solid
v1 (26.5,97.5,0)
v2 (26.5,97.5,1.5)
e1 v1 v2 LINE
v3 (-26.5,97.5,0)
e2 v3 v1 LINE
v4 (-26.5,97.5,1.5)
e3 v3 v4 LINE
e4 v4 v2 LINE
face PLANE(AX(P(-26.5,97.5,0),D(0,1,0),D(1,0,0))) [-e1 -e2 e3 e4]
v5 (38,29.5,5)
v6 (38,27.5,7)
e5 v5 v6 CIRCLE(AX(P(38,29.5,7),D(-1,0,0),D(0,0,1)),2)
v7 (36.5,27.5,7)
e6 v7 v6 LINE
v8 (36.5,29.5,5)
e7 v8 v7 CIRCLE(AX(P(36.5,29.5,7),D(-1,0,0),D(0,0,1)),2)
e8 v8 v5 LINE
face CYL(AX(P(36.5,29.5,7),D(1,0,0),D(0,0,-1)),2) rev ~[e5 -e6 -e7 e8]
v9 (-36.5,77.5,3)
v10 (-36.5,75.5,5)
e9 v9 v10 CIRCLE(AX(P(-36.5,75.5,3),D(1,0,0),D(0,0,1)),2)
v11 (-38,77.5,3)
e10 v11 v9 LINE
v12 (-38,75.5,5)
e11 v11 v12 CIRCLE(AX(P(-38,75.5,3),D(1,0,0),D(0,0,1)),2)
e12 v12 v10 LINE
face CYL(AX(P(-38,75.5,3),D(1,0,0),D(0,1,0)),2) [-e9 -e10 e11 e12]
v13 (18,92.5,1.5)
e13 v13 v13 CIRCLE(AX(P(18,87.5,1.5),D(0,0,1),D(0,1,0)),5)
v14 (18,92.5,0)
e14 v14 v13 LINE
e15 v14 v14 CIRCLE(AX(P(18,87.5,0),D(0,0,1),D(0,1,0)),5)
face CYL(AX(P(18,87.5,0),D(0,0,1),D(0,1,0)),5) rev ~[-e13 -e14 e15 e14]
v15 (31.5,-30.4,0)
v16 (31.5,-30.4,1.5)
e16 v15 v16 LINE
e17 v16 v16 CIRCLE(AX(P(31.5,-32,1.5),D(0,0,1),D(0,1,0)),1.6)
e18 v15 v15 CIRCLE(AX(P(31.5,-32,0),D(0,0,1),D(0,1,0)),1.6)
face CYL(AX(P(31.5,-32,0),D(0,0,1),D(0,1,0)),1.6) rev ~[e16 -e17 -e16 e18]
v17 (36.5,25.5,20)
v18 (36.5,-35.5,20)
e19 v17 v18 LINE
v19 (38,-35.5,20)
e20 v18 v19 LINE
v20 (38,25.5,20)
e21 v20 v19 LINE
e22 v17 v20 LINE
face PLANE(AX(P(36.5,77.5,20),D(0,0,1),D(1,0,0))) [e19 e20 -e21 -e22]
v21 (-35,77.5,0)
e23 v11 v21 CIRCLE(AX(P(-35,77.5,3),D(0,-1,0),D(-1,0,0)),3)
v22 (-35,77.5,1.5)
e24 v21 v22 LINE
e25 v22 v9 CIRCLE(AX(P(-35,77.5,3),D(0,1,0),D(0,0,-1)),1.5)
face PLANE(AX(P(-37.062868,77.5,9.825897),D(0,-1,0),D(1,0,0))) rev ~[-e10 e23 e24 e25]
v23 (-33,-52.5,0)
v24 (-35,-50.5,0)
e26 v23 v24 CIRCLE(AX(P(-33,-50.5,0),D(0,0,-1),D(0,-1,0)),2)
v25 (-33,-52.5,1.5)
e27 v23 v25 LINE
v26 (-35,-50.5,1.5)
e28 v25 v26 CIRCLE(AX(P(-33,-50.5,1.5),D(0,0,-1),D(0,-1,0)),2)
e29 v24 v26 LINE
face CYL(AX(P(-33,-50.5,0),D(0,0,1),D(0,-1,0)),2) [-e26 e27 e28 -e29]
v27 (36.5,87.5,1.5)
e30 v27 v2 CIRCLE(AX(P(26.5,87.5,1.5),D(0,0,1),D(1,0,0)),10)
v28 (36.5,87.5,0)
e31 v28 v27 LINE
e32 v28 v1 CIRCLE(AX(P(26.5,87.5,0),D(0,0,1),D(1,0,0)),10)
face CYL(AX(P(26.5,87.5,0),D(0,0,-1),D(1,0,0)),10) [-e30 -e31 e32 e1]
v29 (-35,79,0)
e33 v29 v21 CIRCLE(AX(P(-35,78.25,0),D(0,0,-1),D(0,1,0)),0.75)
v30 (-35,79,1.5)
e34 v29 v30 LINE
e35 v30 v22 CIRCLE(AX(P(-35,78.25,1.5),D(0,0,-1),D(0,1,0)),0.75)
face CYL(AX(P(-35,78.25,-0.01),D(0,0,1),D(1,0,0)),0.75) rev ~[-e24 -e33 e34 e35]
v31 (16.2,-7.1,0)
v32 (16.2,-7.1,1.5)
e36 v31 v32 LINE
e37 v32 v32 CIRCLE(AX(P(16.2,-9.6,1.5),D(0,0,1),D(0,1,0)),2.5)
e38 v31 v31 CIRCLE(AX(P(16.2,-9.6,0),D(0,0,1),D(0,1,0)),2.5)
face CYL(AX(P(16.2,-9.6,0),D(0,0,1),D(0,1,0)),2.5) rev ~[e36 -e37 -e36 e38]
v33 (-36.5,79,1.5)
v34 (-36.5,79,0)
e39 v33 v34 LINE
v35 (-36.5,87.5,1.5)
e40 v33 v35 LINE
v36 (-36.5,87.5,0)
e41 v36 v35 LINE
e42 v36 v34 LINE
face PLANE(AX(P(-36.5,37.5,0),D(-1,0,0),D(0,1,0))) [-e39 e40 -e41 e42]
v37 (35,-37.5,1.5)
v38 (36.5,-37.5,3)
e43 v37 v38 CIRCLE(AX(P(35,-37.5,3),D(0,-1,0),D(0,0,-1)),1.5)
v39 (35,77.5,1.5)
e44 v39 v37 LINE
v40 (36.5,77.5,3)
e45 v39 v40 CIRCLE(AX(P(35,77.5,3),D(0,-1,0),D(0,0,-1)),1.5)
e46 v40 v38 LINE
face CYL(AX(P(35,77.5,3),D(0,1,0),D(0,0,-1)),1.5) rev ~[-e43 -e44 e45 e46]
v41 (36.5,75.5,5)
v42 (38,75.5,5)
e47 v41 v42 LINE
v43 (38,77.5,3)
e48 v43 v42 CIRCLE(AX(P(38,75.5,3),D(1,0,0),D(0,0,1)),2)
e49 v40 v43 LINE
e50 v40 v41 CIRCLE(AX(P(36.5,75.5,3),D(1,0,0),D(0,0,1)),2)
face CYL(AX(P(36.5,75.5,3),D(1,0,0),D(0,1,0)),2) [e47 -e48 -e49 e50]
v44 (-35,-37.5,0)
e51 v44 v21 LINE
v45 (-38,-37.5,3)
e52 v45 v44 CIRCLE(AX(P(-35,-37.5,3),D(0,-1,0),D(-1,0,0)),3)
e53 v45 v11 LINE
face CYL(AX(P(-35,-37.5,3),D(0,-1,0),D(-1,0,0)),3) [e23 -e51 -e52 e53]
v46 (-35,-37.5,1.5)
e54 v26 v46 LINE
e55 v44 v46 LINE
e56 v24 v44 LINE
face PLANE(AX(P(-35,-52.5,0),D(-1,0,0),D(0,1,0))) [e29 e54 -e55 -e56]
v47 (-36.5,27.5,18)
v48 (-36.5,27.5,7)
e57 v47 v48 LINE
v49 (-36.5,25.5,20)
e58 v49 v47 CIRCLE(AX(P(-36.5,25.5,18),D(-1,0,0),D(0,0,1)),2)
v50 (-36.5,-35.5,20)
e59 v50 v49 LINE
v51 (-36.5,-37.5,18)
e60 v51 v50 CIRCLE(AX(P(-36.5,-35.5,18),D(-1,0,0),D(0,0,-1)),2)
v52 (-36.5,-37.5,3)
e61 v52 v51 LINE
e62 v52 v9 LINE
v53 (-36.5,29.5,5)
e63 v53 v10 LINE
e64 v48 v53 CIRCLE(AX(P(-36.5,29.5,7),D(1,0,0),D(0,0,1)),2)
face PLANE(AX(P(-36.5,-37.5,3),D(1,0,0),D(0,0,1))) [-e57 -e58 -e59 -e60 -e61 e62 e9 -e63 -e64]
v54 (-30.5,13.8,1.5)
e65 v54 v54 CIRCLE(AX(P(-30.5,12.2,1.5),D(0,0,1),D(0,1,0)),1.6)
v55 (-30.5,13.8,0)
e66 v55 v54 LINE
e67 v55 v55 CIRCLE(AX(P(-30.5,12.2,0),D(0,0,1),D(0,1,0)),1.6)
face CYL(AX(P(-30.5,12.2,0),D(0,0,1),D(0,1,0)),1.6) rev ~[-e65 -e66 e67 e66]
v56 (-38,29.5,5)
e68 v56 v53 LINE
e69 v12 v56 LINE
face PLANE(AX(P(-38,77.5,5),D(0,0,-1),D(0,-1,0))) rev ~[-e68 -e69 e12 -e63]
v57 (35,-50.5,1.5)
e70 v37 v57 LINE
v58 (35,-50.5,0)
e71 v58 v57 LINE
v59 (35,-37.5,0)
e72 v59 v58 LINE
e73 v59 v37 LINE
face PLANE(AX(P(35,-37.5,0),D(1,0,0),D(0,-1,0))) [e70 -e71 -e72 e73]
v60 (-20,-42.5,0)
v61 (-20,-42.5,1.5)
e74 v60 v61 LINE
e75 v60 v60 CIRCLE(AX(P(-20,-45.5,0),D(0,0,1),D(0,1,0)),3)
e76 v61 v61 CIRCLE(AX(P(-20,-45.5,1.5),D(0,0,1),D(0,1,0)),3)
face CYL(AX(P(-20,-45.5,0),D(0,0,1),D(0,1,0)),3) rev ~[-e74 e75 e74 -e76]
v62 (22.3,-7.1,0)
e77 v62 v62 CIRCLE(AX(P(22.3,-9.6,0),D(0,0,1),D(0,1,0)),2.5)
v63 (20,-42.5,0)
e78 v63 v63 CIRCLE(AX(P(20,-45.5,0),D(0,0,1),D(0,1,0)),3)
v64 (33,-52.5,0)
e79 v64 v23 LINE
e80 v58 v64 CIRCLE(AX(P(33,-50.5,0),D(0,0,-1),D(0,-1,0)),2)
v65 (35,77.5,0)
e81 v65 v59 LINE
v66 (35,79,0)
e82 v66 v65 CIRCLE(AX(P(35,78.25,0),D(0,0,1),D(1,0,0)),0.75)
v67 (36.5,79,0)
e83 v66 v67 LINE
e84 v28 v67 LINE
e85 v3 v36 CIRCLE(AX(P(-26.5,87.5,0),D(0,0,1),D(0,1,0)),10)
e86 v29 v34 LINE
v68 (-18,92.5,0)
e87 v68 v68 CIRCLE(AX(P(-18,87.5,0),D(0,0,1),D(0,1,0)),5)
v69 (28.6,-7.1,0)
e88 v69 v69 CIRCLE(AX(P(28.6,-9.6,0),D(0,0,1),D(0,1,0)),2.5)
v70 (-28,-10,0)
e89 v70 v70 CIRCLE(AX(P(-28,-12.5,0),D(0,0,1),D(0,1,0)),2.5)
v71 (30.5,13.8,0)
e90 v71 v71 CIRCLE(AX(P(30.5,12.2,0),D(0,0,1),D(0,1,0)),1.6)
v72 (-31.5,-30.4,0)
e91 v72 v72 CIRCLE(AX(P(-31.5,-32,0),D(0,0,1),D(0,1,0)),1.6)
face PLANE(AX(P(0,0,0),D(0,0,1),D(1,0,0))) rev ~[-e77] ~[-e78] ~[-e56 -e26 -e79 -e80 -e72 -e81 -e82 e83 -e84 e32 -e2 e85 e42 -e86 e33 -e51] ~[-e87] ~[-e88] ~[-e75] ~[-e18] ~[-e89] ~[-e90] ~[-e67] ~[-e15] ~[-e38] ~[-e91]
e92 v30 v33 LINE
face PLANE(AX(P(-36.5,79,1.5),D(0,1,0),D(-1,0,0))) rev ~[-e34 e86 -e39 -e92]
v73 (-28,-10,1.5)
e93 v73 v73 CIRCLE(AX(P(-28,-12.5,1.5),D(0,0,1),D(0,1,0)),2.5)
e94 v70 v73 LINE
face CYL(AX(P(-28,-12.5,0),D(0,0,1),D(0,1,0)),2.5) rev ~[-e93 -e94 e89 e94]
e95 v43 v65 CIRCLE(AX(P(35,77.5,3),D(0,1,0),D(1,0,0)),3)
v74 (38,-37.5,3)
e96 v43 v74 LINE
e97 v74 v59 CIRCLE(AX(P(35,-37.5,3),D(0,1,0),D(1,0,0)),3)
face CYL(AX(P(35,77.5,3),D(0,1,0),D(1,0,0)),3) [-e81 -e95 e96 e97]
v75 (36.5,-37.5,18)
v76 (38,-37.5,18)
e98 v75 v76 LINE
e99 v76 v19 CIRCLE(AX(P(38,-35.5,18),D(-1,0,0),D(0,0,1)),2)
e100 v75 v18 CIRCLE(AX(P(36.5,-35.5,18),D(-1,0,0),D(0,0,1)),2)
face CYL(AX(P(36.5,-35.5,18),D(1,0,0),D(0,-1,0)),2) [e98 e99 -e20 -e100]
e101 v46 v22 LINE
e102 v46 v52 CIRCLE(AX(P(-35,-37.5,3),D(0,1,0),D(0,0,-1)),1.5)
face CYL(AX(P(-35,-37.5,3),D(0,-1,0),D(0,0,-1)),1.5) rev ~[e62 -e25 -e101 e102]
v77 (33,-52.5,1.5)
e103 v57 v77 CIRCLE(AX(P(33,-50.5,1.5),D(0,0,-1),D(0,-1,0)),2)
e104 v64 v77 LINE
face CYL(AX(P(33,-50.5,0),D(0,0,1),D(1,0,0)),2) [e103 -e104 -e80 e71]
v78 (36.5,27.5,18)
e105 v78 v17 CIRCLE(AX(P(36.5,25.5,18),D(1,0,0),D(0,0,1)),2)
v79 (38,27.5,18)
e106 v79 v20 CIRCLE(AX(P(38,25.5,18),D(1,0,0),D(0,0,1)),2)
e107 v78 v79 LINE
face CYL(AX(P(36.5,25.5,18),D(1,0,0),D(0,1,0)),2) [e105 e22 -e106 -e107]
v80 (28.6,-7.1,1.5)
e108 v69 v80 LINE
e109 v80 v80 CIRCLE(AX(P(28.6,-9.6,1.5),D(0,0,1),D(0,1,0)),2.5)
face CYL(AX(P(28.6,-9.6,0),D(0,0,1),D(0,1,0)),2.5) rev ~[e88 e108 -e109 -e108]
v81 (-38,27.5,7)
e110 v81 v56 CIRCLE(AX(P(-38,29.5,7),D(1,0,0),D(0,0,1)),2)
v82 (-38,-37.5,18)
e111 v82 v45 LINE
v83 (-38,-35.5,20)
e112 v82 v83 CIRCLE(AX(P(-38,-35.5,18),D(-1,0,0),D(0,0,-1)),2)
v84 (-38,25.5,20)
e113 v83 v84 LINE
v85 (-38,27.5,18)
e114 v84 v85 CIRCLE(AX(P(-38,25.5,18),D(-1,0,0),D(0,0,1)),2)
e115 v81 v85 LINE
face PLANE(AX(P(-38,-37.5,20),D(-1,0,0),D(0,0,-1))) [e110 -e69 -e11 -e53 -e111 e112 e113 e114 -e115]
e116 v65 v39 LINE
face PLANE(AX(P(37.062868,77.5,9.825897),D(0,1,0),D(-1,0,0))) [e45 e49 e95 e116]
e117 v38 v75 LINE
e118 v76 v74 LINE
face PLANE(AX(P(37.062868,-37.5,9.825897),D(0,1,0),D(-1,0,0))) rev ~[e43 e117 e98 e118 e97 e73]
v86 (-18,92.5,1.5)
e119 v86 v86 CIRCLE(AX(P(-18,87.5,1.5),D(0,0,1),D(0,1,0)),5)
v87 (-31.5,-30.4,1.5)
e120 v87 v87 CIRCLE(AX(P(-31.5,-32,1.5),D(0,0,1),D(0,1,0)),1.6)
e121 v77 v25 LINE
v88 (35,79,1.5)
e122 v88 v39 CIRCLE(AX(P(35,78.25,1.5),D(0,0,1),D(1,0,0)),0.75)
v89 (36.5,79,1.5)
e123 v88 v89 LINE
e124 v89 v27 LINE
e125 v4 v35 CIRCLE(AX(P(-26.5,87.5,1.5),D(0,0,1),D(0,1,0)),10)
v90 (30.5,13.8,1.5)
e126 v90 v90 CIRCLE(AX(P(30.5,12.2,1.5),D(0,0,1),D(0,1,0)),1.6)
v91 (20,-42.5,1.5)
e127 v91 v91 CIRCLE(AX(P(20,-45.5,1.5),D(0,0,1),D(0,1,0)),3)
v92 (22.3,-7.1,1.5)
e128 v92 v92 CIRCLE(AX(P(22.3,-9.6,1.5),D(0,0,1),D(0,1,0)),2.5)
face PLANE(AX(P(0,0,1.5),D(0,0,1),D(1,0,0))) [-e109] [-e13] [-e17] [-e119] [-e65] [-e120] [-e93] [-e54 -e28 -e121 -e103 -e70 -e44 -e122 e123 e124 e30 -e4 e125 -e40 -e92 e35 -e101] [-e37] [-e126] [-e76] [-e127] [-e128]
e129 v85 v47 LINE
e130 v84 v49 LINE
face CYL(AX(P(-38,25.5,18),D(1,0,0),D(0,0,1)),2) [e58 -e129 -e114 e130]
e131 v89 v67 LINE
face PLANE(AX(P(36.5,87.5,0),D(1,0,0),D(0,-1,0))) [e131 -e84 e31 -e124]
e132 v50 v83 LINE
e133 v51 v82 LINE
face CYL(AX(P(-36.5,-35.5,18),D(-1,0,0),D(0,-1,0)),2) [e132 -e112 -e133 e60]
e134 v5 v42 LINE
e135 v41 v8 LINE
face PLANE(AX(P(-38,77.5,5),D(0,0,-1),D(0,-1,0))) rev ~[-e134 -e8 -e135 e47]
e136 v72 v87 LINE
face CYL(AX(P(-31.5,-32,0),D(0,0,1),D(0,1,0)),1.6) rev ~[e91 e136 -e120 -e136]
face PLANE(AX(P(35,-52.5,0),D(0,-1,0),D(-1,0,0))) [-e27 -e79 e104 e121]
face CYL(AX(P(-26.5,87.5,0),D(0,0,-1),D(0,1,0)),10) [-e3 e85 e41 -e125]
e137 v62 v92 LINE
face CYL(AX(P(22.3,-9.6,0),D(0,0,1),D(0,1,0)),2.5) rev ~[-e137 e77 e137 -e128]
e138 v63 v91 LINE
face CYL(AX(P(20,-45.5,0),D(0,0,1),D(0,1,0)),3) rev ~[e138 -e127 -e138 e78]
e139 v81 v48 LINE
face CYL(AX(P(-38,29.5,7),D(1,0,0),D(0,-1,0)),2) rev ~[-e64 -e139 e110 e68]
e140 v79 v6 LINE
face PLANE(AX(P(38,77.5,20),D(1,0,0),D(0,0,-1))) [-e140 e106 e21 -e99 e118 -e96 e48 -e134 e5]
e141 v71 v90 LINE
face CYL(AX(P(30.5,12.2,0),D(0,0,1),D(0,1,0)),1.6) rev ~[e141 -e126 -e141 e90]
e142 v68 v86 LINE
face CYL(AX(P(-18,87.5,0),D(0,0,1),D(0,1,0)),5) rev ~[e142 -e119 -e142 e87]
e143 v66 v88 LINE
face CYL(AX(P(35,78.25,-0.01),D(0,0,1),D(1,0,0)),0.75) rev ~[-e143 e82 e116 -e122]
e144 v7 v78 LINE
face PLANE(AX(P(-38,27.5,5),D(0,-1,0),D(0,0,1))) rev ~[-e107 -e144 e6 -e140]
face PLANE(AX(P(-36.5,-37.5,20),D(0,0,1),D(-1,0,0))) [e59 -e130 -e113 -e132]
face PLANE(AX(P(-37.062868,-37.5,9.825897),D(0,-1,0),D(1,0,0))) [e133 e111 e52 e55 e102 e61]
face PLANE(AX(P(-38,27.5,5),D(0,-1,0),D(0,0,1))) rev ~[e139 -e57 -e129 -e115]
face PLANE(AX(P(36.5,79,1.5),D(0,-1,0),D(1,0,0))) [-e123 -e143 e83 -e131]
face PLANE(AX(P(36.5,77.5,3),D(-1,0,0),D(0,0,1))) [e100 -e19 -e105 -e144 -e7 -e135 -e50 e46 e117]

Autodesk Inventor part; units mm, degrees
ref_plane "YZ Plane" through (0, 0, 0) normal (1, 0, 0) x (0, 1, 0)
ref_plane "XZ Plane" through (0, 0, 0) normal (0, 1, 0) x (-1, 0, 0)
ref_plane "XY Plane" through (0, 0, 0) normal (0, 0, 1) x (1, 0, 0)
sketch "Sketch_base" plane through (0, 0, 0) normal (0, 0, 1) x (1, 0, 0)
  line L0 (0, 129.9853) -> (0, -82.9142) construction
  line L1 (-53.9995, 0) -> (53.9995, 0) construction
  line L2 (-36.5, 37.5) -> (36.5, 37.5)
  line L3 (36.5, 37.5) -> (36.5, -37.5)
  line L4 (36.5, -37.5) -> (-36.5, -37.5)
  line L5 (-36.5, -37.5) -> (-36.5, 37.5)
  line L6 (-36.5, 37.5) -> (36.5, -37.5) construction
  line L7 (36.5, 37.5) -> (-36.5, -37.5) construction
  line L8 (-35, -37.5) -> (35, -37.5)
  line L9 (35, -37.5) -> (35, -52.5)
  line L10 (35, -52.5) -> (-35, -52.5)
  line L11 (-35, -52.5) -> (-35, -37.5)
  line L12 (-35, -37.5) -> (35, -52.5) construction
  line L13 (35, -37.5) -> (-35, -52.5) construction
  line L14 (-26.5, 97.5) -> (26.5, 97.5)
  line L15 (36.5, 87.5) -> (36.5, 37.5)
  line L16 (36.5, 37.5) -> (-36.5, 37.5)
  line L17 (-36.5, 37.5) -> (-36.5, 87.5)
  line L18 (-36.5, 97.5) -> (36.5, 37.5) construction
  line L19 (36.5, 97.5) -> (-36.5, 37.5) construction
  arc A0 (-26.5, 97.5) -> (-36.5, 87.5) centre (-26.5, 87.5) ccw
  arc A1 (36.5, 87.5) -> (26.5, 97.5) centre (26.5, 87.5) ccw
  circle A2 centre (-30.5, 12.2) radius 1.6
  circle A3 centre (30.5, 12.2) radius 1.6
  circle A4 centre (16.2, -9.6) radius 2.5
  circle A5 centre (22.3, -9.6) radius 2.5
  circle A6 centre (28.6, -9.6) radius 2.5
  circle A7 centre (-31.5, -32) radius 1.6
  circle A8 centre (31.5, -32) radius 1.6
  circle A9 centre (-28, -12.5) radius 2.5
  point P0 (0, 0)
  point P1 (-20, -45.5)
  point P2 (20, -45.5)
  point P3 (0, -45)
  point P4 (0, 67.5)
  point P5 (-18, 87.5)
  point P6 (18, 87.5)
  point P7 (31.5, -32)
  dimension "d0" = 73
  dimension "d1" = 75
  dimension "d3" = 40
  dimension "d4" = 20
  dimension "d38" = 15
  dimension "d39" = 0
  dimension "d40" = 70
  dimension "d46" = 7
  dimension "d47" = 7
  dimension "d55" = 60
  dimension "d56" = 10
  dimension "d57" = 10
  dimension "d58" = 36
  dimension "d59" = 18
  dimension "d102" = 5.5
  dimension "d103" = 5.5
  dimension "d104" = 63
  dimension "d105" = 31.5
  dimension "d113" = 10
  dimension "d114" = 10
extrude "Plate1" add sketch "Sketch_base" along normal blind 1.5 contours L2 L3 L4 L5 | A2 | A3 | A4 | A5 | A6 | A7 | A8 | A9
sheet face with bend "Face2" sketch "Sketch_base" thickness 1.5 toward (0, 0, 1) bend radius 1.5 contours L4 L9 L10 L11
bend "Bend3"
hole "Hole2" at (-20, -45.5, 0) at (20, -45.5, 0) direction (0, 0, 1) diameter 6 end through all
sheet face with bend "Face3" sketch "Sketch_base" thickness 1.5 toward (0, 0, 1) bend radius 1.5 contours L17 A0 L14 A1 L15 L2
bend "Bend4"
hole "Hole3" at (18, 87.5, 0) at (-18, 87.5, 0) direction (0, 0, 1) diameter 10 end through all
sketch "Sketch4" plane through (-36.5, -37.5, 1.5) normal (-1, 0, 0) x (0, -1, 0)
  line L0 (-115, 0) -> (0, 0)
  line L1 (0, 0) -> (0, 18.5)
  line L2 (0, 18.5) -> (-115, 18.5)
  line L3 (-115, 18.5) -> (-115, 0)
edge flange "Flange3" height 20 angle 90 thickness 1.5 bend radius 1.5 thickness toward (-1, 0, 0) relief round relief width 1.5 relief depth 0.75 edges at (-36.5, 25, 1.5) wall of the first edge with corners at (-36.5, 77.5, 1.5) (-36.5, -37.5, 1.5) (-36.5, -37.5, 20) (-36.5, 77.5, 20)
bend "Bend5"
corner "Corner3"
sketch "Sketch5" plane through (36.5, 87.5, 1.5) normal (1, 0, 0) x (0, 1, 0)
  line L0 (-125, 0) -> (-10, 0)
  line L1 (-10, 0) -> (-10, 18.5)
  line L2 (-10, 18.5) -> (-125, 18.5)
  line L3 (-125, 18.5) -> (-125, 0)
edge flange "Flange4" height 20 angle 90 thickness 1.5 bend radius 1.5 thickness toward (1, 0, 0) relief round relief width 1.5 relief depth 0.75 edges at (36.5, 25, 1.5) wall of the first edge with corners at (36.5, -37.5, 1.5) (36.5, 77.5, 1.5) (36.5, 77.5, 20) (36.5, -37.5, 20)
bend "Bend6"
corner "Corner4"
sketch "Sketch6" plane through (-38, -37.5, 20) normal (-1, 0, 0) x (0, 0, 1)
  line L0 (0, 0) -> (0, 115) projected
  line L1 (0, 115) -> (-15, 115)
  line L2 (-15, 115) -> (-15, 65)
  line L3 (-15, 65) -> (0, 65)
  line L4 (0, 65) -> (0, 115)
  point P0 (-20, 37.5)
  point P1 (0, 65)
  dimension "d96" = 15
  dimension "d97" = 50
extrude "Extrusion1" cut sketch "Sketch6" against normal through all
fillet "Fillet1" radius 2 6 edges at (-37.25, 77.5, 5) (37.25, 77.5, 5) (37.25, 27.5, 20) (37.25, 27.5, 5) (-37.25, 27.5, 5) (-37.25, 27.5, 20)
fillet "Fillet2" radius 2 2 edges at (37.25, -37.5, 20) (-37.25, -37.5, 20)
hole "Hole4" at (-31.5, -32, 0) at (31.5, -32, 0) direction (0, 0, 1) diameter 3.2 end through all
fillet "Corner Round1" radius 2 2 edges at (-35, -52.5, 0.75) (35, -52.5, 0.75)
hole "Hole5" at (-30.5, 12.2, 0) at (30.5, 12.2, 0) direction (0, 0, 1) diameter 3.2 end through all
hole "Hole6" at (16.2, -9.6, 0) at (22.3, -9.6, 0) at (28.6, -9.6, 0) at (-28, -12.5, 0) direction (0, 0, 1) diameter 5 end through all
equation "\"d4\" = 0.5 * d3"
equation "\"d47\" = d46"
equation "\"d59\" = 0.5 * d58"
equation "\"d103\" = d102"
equation "\"d105\" = 0.5 * d104"
equation "\"d114\" = d113"
equation "\"d111\" = Thickness"
equation "\"d121\" = Thickness"
equation "\"d2\" = Thickness"
equation "\"d41\" = BendRadius"
equation "\"d42\" = BendReliefWidth"
equation "\"d44\" = MinimumRemnant"
equation "\"d43\" = BendReliefDepth"
equation "\"d45\" = TransitionRadius"
equation "\"d60\" = BendRadius"
equation "\"d61\" = BendReliefWidth"
equation "\"d63\" = MinimumRemnant"
equation "\"d62\" = BendReliefDepth"
equation "\"d64\" = TransitionRadius"
equation "\"d72\" = BendReliefWidth"
equation "\"d73\" = BendReliefDepth"
equation "\"d74\" = MinimumRemnant"
equation "\"d75\" = TransitionRadius"
equation "\"d78\" = BendRadius"
equation "\"d79\" = CornerReliefSize"
equation "\"d80\" = GapSize"
equation "\"d81\" = JacobiRadiusSize"
equation "\"d84\" = BendReliefWidth"
equation "\"d85\" = BendReliefDepth"
equation "\"d86\" = MinimumRemnant"
equation "\"d87\" = TransitionRadius"
equation "\"d92\" = BendRadius"
equation "\"d93\" = CornerReliefSize"
equation "\"d94\" = GapSize"
equation "\"d95\" = JacobiRadiusSize"
equation "\"BendRadius\" = Thickness"
equation "\"BendReliefWidth\" = Thickness"
equation "\"BendReliefDepth\" = 0.5 * Thickness"
equation "\"CornerReliefSize\" = 4 * Thickness"
equation "\"MinimumRemnant\" = 2 * Thickness"
equation "\"TransitionRadius\" = BendRadius"
equation "\"JacobiRadiusSize\" = BendRadius"
equation "\"GapSize\" = Thickness"
equation "\"Thickness\" = 1.5"
properties part number "Enclosure_Base"
